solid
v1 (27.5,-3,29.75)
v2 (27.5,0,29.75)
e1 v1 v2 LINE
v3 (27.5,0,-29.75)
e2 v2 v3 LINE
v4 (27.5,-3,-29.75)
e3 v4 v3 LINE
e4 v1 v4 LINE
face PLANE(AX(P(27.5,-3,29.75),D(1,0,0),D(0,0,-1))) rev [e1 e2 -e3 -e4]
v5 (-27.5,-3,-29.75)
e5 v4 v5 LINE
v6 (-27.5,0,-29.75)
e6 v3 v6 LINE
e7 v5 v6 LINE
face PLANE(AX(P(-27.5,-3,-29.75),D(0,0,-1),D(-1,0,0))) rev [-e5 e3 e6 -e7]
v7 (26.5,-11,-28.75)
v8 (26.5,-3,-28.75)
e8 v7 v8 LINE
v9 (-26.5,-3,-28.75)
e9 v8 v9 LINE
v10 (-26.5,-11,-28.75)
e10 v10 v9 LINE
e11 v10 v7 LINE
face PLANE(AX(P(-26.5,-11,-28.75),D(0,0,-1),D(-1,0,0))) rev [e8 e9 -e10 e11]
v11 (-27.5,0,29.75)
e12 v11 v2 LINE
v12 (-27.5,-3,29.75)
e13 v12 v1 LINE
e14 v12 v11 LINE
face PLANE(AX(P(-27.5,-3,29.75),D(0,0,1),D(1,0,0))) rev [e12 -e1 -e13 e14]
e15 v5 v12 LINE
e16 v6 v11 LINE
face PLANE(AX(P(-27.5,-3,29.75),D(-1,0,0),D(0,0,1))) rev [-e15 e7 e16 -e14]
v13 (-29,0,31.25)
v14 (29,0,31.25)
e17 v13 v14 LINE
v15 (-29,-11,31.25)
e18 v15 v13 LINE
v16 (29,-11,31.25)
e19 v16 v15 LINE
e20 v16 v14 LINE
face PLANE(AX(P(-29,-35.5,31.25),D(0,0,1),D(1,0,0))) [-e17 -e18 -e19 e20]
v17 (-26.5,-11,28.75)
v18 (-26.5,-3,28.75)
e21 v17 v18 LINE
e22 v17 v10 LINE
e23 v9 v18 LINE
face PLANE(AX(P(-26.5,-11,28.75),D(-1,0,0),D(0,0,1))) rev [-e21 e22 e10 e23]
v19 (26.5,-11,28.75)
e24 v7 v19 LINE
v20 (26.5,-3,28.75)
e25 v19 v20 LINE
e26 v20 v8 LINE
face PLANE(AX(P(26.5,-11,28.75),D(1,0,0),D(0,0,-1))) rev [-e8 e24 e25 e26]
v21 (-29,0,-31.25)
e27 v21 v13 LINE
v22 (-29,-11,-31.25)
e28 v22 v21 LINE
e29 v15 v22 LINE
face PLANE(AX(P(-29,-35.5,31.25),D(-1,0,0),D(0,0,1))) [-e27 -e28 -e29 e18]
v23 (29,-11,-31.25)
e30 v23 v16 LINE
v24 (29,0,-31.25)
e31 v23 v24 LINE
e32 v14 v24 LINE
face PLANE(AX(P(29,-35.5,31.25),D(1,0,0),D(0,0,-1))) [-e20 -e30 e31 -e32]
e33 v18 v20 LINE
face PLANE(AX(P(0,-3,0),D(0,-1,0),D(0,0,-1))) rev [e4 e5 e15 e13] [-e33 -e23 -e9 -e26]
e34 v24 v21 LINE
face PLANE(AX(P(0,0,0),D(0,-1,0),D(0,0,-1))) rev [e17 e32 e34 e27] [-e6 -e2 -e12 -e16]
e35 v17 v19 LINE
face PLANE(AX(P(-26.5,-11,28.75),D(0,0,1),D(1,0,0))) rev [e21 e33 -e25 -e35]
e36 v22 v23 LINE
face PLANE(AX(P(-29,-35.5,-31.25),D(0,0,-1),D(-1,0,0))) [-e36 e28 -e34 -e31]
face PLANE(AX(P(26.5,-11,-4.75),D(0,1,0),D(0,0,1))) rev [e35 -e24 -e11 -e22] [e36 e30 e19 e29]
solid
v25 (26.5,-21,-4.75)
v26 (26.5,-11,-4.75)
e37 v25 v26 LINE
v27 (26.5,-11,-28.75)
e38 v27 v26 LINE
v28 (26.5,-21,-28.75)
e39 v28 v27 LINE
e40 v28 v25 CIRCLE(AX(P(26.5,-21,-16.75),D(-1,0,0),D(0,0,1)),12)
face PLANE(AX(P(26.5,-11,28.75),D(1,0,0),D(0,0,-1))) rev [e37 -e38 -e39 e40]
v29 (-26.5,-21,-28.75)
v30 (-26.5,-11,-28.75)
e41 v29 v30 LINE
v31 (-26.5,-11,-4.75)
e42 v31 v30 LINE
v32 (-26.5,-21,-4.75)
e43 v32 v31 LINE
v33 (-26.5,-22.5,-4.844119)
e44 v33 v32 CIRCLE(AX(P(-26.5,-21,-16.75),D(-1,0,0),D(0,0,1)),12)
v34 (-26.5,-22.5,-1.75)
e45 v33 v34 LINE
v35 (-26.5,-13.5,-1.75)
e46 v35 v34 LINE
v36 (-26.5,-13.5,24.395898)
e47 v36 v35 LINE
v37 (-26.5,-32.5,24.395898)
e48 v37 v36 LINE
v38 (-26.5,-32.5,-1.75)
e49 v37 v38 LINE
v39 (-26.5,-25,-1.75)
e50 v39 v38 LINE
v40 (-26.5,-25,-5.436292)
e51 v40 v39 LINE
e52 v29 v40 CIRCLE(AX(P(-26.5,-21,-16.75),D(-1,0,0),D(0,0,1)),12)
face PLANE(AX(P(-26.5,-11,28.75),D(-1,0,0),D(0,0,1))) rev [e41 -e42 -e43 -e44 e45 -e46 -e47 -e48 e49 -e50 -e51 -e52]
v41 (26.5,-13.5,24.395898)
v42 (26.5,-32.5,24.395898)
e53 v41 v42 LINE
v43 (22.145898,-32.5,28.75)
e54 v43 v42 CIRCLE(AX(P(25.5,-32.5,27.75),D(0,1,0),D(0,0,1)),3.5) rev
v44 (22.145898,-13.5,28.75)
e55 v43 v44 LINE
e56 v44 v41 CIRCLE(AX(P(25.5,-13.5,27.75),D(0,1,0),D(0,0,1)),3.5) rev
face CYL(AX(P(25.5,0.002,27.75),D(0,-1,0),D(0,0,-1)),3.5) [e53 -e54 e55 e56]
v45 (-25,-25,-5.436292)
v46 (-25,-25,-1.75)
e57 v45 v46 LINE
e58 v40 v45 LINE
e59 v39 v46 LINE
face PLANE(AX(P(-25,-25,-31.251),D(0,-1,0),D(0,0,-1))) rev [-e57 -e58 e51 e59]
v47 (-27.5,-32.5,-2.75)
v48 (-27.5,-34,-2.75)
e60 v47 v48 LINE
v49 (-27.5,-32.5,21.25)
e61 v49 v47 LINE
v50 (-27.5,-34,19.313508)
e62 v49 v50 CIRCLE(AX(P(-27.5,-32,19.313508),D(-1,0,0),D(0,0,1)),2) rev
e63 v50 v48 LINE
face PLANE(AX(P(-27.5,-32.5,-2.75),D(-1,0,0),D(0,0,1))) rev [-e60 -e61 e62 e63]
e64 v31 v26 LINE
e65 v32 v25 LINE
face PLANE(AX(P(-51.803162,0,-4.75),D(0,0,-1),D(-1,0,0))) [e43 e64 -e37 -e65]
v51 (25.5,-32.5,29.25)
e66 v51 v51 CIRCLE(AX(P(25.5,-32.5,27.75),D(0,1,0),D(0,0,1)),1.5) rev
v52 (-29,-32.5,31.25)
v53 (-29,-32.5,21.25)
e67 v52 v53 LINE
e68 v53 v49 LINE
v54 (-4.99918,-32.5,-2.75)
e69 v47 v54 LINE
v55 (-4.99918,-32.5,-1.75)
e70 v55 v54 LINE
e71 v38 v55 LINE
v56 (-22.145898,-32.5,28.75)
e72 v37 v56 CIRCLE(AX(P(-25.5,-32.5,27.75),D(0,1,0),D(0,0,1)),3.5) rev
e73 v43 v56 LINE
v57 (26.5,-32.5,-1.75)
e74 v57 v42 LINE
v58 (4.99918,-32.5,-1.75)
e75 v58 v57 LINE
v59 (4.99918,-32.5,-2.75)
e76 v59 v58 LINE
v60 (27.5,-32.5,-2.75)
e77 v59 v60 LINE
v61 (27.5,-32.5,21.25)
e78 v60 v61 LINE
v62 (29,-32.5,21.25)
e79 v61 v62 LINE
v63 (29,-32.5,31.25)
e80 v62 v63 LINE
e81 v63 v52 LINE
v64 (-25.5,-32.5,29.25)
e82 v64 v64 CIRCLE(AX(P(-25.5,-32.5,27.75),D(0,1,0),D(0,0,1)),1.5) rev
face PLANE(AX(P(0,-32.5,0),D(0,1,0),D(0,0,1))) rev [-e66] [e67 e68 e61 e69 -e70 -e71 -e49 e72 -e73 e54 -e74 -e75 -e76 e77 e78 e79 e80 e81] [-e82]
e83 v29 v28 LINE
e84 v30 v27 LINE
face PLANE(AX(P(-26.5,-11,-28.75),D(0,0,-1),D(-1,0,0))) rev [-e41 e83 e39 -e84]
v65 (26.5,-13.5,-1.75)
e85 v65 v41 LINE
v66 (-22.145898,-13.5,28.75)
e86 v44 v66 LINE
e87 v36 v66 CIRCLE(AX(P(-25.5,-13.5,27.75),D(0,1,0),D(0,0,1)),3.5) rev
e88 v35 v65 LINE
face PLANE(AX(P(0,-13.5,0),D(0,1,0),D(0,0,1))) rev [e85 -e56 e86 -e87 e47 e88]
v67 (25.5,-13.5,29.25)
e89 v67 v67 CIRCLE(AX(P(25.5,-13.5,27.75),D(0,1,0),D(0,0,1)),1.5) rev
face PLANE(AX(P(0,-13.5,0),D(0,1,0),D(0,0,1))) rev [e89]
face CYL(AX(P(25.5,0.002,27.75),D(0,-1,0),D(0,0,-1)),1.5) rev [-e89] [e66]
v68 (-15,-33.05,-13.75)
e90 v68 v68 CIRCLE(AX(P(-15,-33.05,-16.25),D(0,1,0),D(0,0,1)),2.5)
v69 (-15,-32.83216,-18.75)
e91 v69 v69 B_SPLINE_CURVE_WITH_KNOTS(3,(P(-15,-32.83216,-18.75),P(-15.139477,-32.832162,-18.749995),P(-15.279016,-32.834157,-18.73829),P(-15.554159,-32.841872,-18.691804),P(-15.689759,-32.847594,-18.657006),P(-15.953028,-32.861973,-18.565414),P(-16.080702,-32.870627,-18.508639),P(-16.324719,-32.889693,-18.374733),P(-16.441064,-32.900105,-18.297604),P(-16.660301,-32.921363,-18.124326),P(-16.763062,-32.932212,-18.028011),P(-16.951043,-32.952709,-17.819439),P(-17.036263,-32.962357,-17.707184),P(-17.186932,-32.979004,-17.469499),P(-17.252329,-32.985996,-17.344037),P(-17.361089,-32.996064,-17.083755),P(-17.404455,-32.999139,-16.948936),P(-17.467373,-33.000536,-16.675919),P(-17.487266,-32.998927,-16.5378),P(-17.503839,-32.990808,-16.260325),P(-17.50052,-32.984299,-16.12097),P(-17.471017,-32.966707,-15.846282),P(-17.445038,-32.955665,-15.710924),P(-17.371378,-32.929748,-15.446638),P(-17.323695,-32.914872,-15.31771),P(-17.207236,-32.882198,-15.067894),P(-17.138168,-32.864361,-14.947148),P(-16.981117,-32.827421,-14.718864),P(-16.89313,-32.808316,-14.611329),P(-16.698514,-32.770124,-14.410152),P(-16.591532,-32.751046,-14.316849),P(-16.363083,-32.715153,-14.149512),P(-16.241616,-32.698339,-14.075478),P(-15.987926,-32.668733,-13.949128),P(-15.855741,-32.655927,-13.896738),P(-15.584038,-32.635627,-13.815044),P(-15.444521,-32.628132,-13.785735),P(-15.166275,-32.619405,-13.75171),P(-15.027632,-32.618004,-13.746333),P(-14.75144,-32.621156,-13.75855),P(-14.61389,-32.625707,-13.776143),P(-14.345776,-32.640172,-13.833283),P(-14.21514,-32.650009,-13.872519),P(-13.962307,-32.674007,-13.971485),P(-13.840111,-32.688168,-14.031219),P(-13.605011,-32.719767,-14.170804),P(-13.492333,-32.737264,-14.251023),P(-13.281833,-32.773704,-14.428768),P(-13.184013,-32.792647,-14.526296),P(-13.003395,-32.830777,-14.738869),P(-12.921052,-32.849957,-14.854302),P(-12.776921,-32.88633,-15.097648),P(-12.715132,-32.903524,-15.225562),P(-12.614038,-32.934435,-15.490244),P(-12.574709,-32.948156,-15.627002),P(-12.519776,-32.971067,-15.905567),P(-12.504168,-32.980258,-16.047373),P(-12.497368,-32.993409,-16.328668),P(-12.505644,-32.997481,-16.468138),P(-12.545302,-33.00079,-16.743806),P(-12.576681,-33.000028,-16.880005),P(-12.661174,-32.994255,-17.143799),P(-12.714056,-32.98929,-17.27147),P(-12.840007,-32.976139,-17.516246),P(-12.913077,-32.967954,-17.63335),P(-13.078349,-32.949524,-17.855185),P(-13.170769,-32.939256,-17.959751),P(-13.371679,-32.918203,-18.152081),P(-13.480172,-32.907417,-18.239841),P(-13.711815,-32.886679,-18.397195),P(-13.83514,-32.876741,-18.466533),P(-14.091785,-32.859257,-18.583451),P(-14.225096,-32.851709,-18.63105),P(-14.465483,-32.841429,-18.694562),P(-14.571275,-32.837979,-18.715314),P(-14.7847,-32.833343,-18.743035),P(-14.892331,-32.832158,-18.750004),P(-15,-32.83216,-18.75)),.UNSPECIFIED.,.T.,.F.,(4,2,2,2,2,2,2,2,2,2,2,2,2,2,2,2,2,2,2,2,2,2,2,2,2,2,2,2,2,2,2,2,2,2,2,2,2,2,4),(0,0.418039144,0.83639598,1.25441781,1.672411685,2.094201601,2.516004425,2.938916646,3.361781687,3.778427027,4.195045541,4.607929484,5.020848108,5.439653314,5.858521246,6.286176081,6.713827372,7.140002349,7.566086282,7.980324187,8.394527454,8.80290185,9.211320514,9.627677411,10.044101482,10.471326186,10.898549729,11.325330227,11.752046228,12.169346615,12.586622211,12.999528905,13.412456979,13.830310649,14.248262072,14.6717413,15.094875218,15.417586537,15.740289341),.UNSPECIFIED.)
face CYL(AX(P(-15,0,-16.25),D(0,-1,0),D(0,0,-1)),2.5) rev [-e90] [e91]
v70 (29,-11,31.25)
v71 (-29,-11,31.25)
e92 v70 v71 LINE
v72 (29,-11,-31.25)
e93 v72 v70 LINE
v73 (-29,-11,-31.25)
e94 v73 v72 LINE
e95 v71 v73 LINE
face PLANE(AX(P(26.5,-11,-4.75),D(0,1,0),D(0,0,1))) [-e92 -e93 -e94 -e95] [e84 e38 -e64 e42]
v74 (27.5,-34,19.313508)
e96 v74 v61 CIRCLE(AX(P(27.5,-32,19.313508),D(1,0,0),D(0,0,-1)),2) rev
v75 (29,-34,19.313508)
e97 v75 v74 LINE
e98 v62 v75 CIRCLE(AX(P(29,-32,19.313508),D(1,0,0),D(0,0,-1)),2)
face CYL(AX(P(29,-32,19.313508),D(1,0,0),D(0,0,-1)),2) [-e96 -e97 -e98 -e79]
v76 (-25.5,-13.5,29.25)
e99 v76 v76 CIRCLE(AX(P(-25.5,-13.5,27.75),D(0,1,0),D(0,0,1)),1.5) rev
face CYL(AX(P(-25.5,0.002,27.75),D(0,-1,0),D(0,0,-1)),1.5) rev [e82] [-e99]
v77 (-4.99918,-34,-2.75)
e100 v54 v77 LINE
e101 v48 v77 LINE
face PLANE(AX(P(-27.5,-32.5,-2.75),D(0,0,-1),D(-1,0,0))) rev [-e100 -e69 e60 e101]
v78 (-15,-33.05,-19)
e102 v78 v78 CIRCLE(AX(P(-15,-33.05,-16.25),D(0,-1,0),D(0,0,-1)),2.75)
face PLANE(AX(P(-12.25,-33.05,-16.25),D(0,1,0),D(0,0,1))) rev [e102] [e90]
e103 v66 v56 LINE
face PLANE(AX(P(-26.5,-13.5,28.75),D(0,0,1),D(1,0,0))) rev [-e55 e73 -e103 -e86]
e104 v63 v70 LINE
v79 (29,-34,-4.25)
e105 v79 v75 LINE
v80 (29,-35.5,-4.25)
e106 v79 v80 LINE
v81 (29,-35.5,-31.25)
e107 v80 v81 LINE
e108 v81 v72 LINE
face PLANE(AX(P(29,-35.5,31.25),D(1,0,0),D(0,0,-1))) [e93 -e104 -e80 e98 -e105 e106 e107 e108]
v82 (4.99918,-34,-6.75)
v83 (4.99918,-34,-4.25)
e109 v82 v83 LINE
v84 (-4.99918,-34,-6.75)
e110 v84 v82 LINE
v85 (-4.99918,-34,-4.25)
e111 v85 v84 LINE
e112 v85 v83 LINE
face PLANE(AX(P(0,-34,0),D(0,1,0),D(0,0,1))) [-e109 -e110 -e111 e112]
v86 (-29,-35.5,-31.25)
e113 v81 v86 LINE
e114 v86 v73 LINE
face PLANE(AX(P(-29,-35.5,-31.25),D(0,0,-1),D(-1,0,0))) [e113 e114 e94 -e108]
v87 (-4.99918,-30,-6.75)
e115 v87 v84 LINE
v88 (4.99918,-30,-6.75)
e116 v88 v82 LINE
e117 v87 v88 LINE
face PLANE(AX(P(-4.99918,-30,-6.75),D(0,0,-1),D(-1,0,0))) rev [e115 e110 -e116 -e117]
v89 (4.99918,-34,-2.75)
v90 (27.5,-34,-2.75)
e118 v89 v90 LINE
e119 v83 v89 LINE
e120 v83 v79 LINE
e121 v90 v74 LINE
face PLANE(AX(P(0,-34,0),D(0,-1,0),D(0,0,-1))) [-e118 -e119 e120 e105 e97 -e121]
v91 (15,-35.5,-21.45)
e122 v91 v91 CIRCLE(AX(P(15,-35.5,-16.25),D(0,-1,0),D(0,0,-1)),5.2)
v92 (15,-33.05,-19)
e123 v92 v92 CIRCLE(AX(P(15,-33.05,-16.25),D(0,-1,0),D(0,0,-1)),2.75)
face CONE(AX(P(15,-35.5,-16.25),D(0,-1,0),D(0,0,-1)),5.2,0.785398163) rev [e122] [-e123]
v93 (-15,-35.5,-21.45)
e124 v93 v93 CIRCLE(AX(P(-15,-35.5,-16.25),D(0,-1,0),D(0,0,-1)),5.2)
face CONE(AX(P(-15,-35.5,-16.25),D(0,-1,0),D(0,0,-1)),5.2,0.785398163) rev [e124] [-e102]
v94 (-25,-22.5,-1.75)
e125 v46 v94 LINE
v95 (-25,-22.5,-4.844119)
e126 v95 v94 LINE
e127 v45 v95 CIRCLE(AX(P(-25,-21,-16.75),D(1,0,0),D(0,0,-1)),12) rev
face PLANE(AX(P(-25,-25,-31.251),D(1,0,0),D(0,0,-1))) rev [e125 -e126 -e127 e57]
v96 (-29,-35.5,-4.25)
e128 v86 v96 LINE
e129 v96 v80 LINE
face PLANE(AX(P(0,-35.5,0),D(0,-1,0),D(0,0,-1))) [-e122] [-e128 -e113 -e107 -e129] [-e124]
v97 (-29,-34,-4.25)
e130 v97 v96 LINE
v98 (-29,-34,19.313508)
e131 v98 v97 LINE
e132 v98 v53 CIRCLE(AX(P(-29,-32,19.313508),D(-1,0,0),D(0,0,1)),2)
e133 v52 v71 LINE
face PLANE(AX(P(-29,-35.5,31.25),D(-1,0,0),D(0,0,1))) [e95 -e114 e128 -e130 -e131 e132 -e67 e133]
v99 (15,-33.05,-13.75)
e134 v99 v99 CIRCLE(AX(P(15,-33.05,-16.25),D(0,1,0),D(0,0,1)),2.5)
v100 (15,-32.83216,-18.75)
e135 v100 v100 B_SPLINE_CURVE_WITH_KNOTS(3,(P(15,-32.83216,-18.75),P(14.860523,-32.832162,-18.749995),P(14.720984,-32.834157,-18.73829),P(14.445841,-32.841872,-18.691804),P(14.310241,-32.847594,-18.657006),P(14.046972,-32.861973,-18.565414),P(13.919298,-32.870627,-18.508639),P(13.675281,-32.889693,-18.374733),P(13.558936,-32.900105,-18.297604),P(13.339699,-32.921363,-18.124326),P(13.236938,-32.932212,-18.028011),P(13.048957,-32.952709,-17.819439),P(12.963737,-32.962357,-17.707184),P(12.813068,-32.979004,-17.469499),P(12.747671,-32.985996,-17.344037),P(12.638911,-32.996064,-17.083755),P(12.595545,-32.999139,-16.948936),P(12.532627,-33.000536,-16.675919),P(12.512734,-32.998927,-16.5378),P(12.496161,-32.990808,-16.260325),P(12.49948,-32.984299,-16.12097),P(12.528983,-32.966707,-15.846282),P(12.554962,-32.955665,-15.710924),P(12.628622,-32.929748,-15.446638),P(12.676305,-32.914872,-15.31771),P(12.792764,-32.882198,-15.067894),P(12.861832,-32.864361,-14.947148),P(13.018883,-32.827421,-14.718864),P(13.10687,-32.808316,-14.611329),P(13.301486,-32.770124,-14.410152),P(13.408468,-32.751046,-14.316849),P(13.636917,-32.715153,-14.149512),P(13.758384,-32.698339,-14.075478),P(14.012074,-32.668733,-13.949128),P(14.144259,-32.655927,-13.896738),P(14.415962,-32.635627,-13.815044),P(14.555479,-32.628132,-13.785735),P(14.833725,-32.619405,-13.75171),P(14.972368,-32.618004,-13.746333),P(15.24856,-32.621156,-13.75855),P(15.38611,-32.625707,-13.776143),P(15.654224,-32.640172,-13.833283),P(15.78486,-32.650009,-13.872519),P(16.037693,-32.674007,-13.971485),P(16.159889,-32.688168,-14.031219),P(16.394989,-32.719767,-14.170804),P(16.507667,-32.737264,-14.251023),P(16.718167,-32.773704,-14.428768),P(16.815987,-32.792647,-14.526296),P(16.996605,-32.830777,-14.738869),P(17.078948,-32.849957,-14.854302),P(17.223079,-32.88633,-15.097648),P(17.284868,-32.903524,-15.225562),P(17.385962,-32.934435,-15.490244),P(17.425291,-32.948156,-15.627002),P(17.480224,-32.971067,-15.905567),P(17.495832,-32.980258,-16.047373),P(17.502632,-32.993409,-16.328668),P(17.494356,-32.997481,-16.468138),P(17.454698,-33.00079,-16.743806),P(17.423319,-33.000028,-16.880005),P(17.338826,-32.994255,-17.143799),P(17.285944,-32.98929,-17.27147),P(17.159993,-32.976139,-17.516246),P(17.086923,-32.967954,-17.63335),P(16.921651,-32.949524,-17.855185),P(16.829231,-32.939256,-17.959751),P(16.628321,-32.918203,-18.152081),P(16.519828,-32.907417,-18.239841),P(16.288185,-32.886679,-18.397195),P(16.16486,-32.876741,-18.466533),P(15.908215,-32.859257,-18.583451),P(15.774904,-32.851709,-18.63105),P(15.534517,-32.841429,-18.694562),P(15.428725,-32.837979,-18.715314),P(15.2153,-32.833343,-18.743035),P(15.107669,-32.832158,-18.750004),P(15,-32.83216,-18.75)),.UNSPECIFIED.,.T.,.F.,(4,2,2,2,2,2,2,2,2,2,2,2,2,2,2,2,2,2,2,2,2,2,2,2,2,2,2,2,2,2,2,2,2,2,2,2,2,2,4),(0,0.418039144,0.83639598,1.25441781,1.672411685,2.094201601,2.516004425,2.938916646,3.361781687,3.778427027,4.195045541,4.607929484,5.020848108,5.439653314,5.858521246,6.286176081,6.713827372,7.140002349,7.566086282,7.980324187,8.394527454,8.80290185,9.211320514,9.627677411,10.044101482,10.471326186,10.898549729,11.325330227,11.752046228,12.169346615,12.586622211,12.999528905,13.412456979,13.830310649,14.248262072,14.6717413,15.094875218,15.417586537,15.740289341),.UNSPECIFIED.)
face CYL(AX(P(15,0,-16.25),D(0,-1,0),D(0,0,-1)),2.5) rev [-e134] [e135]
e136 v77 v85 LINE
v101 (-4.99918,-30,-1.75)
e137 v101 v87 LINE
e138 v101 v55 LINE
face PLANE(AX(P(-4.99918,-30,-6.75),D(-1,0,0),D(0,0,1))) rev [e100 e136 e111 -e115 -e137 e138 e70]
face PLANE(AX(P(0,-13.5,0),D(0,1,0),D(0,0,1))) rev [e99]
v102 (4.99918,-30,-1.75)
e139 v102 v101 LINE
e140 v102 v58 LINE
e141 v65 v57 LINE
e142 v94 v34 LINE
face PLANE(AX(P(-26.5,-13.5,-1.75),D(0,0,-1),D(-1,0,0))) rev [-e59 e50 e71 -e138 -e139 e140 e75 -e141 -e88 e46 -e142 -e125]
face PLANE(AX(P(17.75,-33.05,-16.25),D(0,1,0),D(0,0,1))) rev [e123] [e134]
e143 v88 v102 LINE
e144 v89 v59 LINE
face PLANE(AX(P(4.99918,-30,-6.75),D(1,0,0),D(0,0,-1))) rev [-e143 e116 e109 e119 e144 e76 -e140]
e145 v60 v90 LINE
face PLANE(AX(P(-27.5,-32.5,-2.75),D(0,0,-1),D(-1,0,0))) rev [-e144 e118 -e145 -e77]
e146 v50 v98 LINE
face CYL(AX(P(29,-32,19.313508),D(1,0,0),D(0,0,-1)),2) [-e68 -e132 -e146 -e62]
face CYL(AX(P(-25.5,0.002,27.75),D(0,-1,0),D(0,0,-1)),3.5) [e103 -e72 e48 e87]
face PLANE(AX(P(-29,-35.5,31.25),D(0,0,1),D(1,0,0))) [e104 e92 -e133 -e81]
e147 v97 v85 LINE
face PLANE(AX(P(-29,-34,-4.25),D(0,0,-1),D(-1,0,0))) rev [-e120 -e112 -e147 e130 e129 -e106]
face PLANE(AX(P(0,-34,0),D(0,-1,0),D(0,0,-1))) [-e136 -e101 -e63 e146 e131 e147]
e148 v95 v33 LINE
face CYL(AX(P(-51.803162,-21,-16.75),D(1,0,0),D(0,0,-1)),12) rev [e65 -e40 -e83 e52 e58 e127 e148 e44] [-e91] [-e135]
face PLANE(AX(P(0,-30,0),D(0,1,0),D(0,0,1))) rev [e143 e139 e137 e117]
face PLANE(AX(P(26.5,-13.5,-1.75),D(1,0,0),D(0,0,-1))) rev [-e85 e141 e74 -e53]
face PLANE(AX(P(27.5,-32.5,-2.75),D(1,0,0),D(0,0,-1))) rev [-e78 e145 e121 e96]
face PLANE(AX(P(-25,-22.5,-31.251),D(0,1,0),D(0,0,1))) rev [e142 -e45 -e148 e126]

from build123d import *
from build123d.topology import SkipClean

# Parameters (mm, degrees)
SKETCH1_W                 = 58
SKETCH1_H                 = 62.5
BOSS_EXTRUDE1_DEPTH       = 35.5
SKETCH2_W                 = 55
SKETCH2_H                 = 59.5
CUT_EXTRUDE1_DEPTH        = 3
SKETCH3_W                 = 53
SKETCH3_H                 = 57.5
CUT_EXTRUDE2_DEPTH        = 8
SKETCH4_W                 = 53
SKETCH4_H                 = 24.5
CUT_EXTRUDE3_DEPTH        = 22
SKETCH5_W                 = 53
SKETCH5_H                 = 30.5
CUT_EXTRUDE4_DEPTH        = 22
BOSS_EXTRUDE2_REACH       = 57.478
SKETCH6_R                 = 3.5
SKETCH6_R_2               = 1.5
SKETCH6_2_R               = 1.5
CUT_EXTRUDE5_DEPTH        = 22
BOSS_EXTRUDE4_DEPTH       = 53
SKETCH8_W                 = 58
SKETCH8_H                 = 35.5
CUT_EXTRUDE6_DEPTH        = 1.5
SKETCH10_W                = 9.998360964
SKETCH10_H                = 5
CUT_EXTRUDE8_DEPTH        = 4
CUT_EXTRUDE7_REACH        = 58.482
CUT_EXTRUDE7_END_RADIUS   = 12
SKETCH9_W                 = 1.5
SKETCH9_H                 = 2.5
SKETCH11_W                = 55
SKETCH11_H                = 32.5
CUT_EXTRUDE9_DEPTH        = 1.5
SKETCH12_W                = 58
SKETCH12_H                = 10
CUT_EXTRUDE10_DEPTH       = 1.5
FILLET2_R                 = 2
ADVANCEDHOLE1_OUTLINE_R   = 2.75
ADVANCEDHOLE1_DEPTH       = 2.45
ADVANCEDHOLE1_DRAFT       = 45
ADVANCEDHOLE1_2_OUTLINE_R = 2.75
ADVANCEDHOLE1_2_DEPTH     = 2.45
ADVANCEDHOLE1_2_DRAFT     = 45
SKETCH13_R                = 2.5
CUT_EXTRUDE11_DEPTH       = 56.478036195
SPLIT1_START              = -31.25
SPLIT1_OUTLINE_W          = 58
SPLIT1_OUTLINE_H          = 11
SPLIT1_DEPTH              = 62.5
SPLIT1_2_DEPTH            = 62.5
SPLIT1_3_OUTLINE_W        = 53
SPLIT1_3_OUTLINE_H        = 8
SPLIT1_3_DEPTH            = 2.5
SPLIT1_START_2            = 28.75
SPLIT1_4_OUTLINE_W        = 53
SPLIT1_4_OUTLINE_H        = 8
SPLIT1_4_DEPTH            = 2.5
SPLIT1_5_OUTLINE_W        = 55
SPLIT1_5_OUTLINE_H        = 3
SPLIT1_5_DEPTH            = 1.5
SPLIT1_START_3            = 29.75
SPLIT1_6_OUTLINE_W        = 55
SPLIT1_6_OUTLINE_H        = 3
SPLIT1_6_DEPTH            = 1.5


# Read off the part's stored shape, not the designer's step: AdvancedHole1, Split1
with BuildPart() as part:
    # Sketch1 → Boss-Extrude1 (new body)
    with BuildSketch(Plane(origin=(0, 0, 0), x_dir=(1, 0, 0), z_dir=(0, 1, 0))):
        Rectangle(SKETCH1_W, SKETCH1_H)
    extrude(amount=-BOSS_EXTRUDE1_DEPTH)

    # Sketch2 → Cut-Extrude1 (cut)
    with BuildSketch(Plane(origin=(0, 0, 0), x_dir=(1, 0, 0), z_dir=(0, 1, 0))):
        Rectangle(SKETCH2_W, SKETCH2_H)
    extrude(amount=-CUT_EXTRUDE1_DEPTH, mode=Mode.SUBTRACT)

    # Sketch3 → Cut-Extrude2 (cut)
    with BuildSketch(Plane(origin=(0, -3, 0), x_dir=(1, 0, 0), z_dir=(0, 1, 0))):
        Rectangle(SKETCH3_W, SKETCH3_H)
    extrude(amount=-CUT_EXTRUDE2_DEPTH, mode=Mode.SUBTRACT)

    # Sketch4 → Cut-Extrude3 (cut)
    with BuildSketch(Plane(origin=(0, -11, 0), x_dir=(1, 0, 0), z_dir=(0, 1, 0))):
        with Locations((0, 16.5)):
            Rectangle(SKETCH4_W, SKETCH4_H)
    extrude(amount=-CUT_EXTRUDE3_DEPTH, mode=Mode.SUBTRACT)

    # Sketch5 → Cut-Extrude4 (cut)
    with BuildSketch(Plane.XZ.offset(35.5)):
        with Locations((0, 13.5)):
            Rectangle(SKETCH5_W, SKETCH5_H)
    extrude(amount=-CUT_EXTRUDE4_DEPTH, mode=Mode.SUBTRACT)

    # Sketch6 → Boss-Extrude2 (add, up to next)
    with BuildSketch(Plane.XZ.offset(35.5), mode=Mode.PRIVATE) as boss_extrude2_sk1:
        with Locations((-25.5, 27.75)):
            Circle(SKETCH6_R)
        with Locations((-25.5, 27.75)):
            Circle(SKETCH6_R_2, mode=Mode.SUBTRACT)
    boss_extrude2_tool1 = extrude(boss_extrude2_sk1.sketch, amount=-BOSS_EXTRUDE2_REACH, mode=Mode.PRIVATE) - part.part
    # Sketch6 → Boss-Extrude2 (add, up to next)
    with BuildSketch(Plane.XZ.offset(35.5), mode=Mode.PRIVATE) as boss_extrude2_sk2:
        with Locations((25.5, 27.75)):
            Circle(SKETCH6_R)
        with Locations((25.5, 27.75)):
            Circle(SKETCH6_R_2, mode=Mode.SUBTRACT)
    boss_extrude2_tool2 = extrude(boss_extrude2_sk2.sketch, amount=-BOSS_EXTRUDE2_REACH, mode=Mode.PRIVATE) - part.part
    add(boss_extrude2_tool1.solids().sort_by_distance((-28.901005, -35.5, 27.75))[0])
    add(boss_extrude2_tool2.solids().sort_by_distance((22.098995, -35.5, 27.75))[0])

    # Sketch6<2> → Cut-Extrude5 (cut)
    with BuildSketch(Plane.XZ.offset(35.5)):
        with Locations(Location((-25.5, 27.75, 0), (0, 0, 270))):
            Circle(SKETCH6_2_R)
        with Locations(Location((25.5, 27.75, 0), (0, 0, 90))):
            Circle(SKETCH6_2_R)
    extrude(amount=-CUT_EXTRUDE5_DEPTH, mode=Mode.SUBTRACT)

    # Sketch7 → Boss-Extrude4 (add)
    with BuildSketch(Plane.ZY.offset(-26.5)):
        with BuildLine():
            Line((-16.75, -33), (-4.25, -33))
            Line((-4.25, -33), (-4.25, -11))
            Line((-4.25, -11), (-4.75, -11))
            Line((-4.75, -11), (-4.75, -21))
            ThreePointArc((-4.75, -21), (-8.264718626, -29.485281374), (-16.75, -33))
        make_face()
        with BuildLine():
            Line((-28.75, -33), (-16.75, -33))
            ThreePointArc((-16.75, -33), (-25.235281374, -29.485281374), (-28.75, -21))
            Line((-28.75, -21), (-28.75, -33))
        make_face()
    extrude(amount=BOSS_EXTRUDE4_DEPTH)

    # Sketch8 → Cut-Extrude6 (cut)
    with BuildSketch(Plane.XZ.offset(35.5)):
        with Locations((0, 13.5)):
            Rectangle(SKETCH8_W, SKETCH8_H)
    extrude(amount=-CUT_EXTRUDE6_DEPTH, mode=Mode.SUBTRACT)

    # Sketch10 → Cut-Extrude8 (cut)
    with BuildSketch(Plane.XZ.offset(34)):
        with Locations((0, -4.25)):
            Rectangle(SKETCH10_W, SKETCH10_H)
    extrude(amount=-CUT_EXTRUDE8_DEPTH, mode=Mode.SUBTRACT)

    # Cut-Extrude7: up to this cylinder (the profile starts outside it)
    cut_extrude7_end = Plane(origin=(-25.75, -21, -16.75), z_dir=(1, 0, 0)) * Cylinder(CUT_EXTRUDE7_END_RADIUS, 141.964, mode=Mode.PRIVATE)
    # Sketch9 → Cut-Extrude7 (cut, up to the surface)
    with BuildSketch(Plane.XY.offset(-1.75), mode=Mode.PRIVATE) as cut_extrude7_sk1:
        with Locations((-25.75, -23.75)):
            Rectangle(SKETCH9_W, SKETCH9_H)
    cut_extrude7_tool1 = extrude(cut_extrude7_sk1.sketch, amount=-CUT_EXTRUDE7_REACH, mode=Mode.PRIVATE) - cut_extrude7_end
    add(cut_extrude7_tool1.solids().sort_by_distance((-25.75, -23.75, -1.75))[0], mode=Mode.SUBTRACT)

    # Sketch11 → Cut-Extrude9 (cut)
    with BuildSketch(Plane.XZ.offset(34)):
        with Locations((0, 13.5)):
            Rectangle(SKETCH11_W, SKETCH11_H)
    extrude(amount=-CUT_EXTRUDE9_DEPTH, mode=Mode.SUBTRACT)

    # Sketch12 → Cut-Extrude10 (cut)
    with BuildSketch(Plane.XZ.offset(34)):
        with Locations((0, 26.25)):
            Rectangle(SKETCH12_W, SKETCH12_H)
    extrude(amount=-CUT_EXTRUDE10_DEPTH, mode=Mode.SUBTRACT)

    # Fillet2
    # the kernel refuses this fillet: 2 mm, written as the material it takes off along each edge
    with BuildSketch(Plane(origin=(-22.658770817, -34, 21.25), x_dir=(0, 0, -1), z_dir=(-1, 0, 0))) as fillet2_piece_1:
        with BuildLine():
            CenterArc((1.936491673, -2), FILLET2_R, 90, 75.522487814)
            Line((0, -1.5), (-0.038729833, -1.49))
            ThreePointArc((-0.038729833, -1.49), (-0.04, -0.75), (-0.04, 0))
            Line((-0.04, 0), (0, 0.04))
            Line((0, 0.04), (1.936491673, 0.04))
            Line((1.936491673, 0.04), (1.936491673, 0))
        make_face()
    extrude(amount=11.182458366, mode=Mode.SUBTRACT)
    with BuildSketch(Plane(origin=(33.841229183, -34, 21.25), x_dir=(0, 1, 0), z_dir=(-1, 0, 0))) as fillet2_piece_2:
        with BuildLine():
            CenterArc((2, 1.936491673), FILLET2_R, 180, 75.522487814)
            Line((0, 1.936491673), (-0.04, 1.936491673))
            Line((-0.04, 1.936491673), (-0.04, 0))
            Line((-0.04, 0), (0, -0.04))
            ThreePointArc((0, -0.04), (0.75, -0.04), (1.49, -0.038729833))
            Line((1.49, -0.038729833), (1.5, 0))
        make_face()
    extrude(amount=11.182458366, mode=Mode.SUBTRACT)


with BuildPart() as advancedhole1_tool:
    # AdvancedHole1 outline → AdvancedHole1 (with draft: the straight prism first)
    with BuildSketch(Plane(origin=(0, -33.05, 0), x_dir=(1, 0, 0), z_dir=(0, 1, 0))):
        with Locations((15, 16.25)):
            Circle(ADVANCEDHOLE1_OUTLINE_R)
    extrude(amount=-ADVANCEDHOLE1_DEPTH)
    # AdvancedHole1: the draft: its side faces are tilted about the plane it starts from
    advancedhole1_sides = [advancedhole1_tool.faces().sort_by_distance(p)[0] for p in [
        (12.25, -34.275, -16.25),
    ]]
    draft(advancedhole1_sides, Plane(origin=(0, -33.05, 0), x_dir=(1, 0, 0), z_dir=(0, 1, 0)), ADVANCEDHOLE1_DRAFT)


with BuildPart() as part_1:
    add(part.part)

    # AdvancedHole1: cut by advancedhole1_tool
    add(advancedhole1_tool.part, mode=Mode.SUBTRACT)


with BuildPart() as advancedhole1_2_tool:
    # AdvancedHole1 2 outline → AdvancedHole1 2 (with draft: the straight prism first)
    with BuildSketch(Plane(origin=(0, -33.05, 0), x_dir=(1, 0, 0), z_dir=(0, 1, 0))):
        with Locations((-15, 16.25)):
            Circle(ADVANCEDHOLE1_2_OUTLINE_R)
    extrude(amount=-ADVANCEDHOLE1_2_DEPTH)
    # AdvancedHole1 2: the draft: its side faces are tilted about the plane it starts from
    advancedhole1_2_sides = [advancedhole1_2_tool.faces().sort_by_distance(p)[0] for p in [
        (-17.75, -34.275, -16.25),
    ]]
    draft(advancedhole1_2_sides, Plane(origin=(0, -33.05, 0), x_dir=(1, 0, 0), z_dir=(0, 1, 0)), ADVANCEDHOLE1_2_DRAFT)


with BuildPart() as part_2:
    add(part_1.part)

    # AdvancedHole1 2: cut by advancedhole1_2_tool
    add(advancedhole1_2_tool.part, mode=Mode.SUBTRACT)

    # Sketch13 → Cut-Extrude11 (cut, through all)
    with SkipClean():  # the faces are left unmerged after this step: merging them gives an invalid solid
        with BuildSketch(Plane.XZ.offset(35.5)):
            with Locations(Location((15, -16.25, 0), (0, 0, 270))):
                Circle(SKETCH13_R)
            with Locations(Location((-15, -16.25, 0), (0, 0, 270))):
                Circle(SKETCH13_R)
        extrude(amount=-CUT_EXTRUDE11_DEPTH, mode=Mode.SUBTRACT)

    # Split1 outline → Split1 (cut)
    with SkipClean():  # the faces are left unmerged after this step: merging them gives an invalid solid
        with BuildSketch(Plane.XY.offset(SPLIT1_START)):
            with Locations((0, -5.5)):
                Rectangle(SPLIT1_OUTLINE_W, SPLIT1_OUTLINE_H)
        extrude(amount=SPLIT1_DEPTH, mode=Mode.SUBTRACT)


with BuildPart() as body_2:
    # Split1 2 outline → Split1 2 (new body)
    with BuildSketch(Plane.XY.offset(SPLIT1_START)):
        Polygon((26.5, -11), (29, -11), (29, 0), (27.5, 0), (27.5, -3), (26.5, -3), align=None)
        Polygon((-29, -11), (-26.5, -11), (-26.5, -3), (-27.5, -3), (-27.5, 0), (-29, 0), align=None)
    extrude(amount=SPLIT1_2_DEPTH)

    # Split1 3 outline → Split1 3 (add)
    with BuildSketch(Plane.XY.offset(SPLIT1_START)):
        with Locations((0, -7)):
            Rectangle(SPLIT1_3_OUTLINE_W, SPLIT1_3_OUTLINE_H)
    extrude(amount=SPLIT1_3_DEPTH)

    # Split1 4 outline → Split1 4 (add)
    with BuildSketch(Plane.XY.offset(SPLIT1_START_2)):
        with Locations((0, -7)):
            Rectangle(SPLIT1_4_OUTLINE_W, SPLIT1_4_OUTLINE_H)
    extrude(amount=SPLIT1_4_DEPTH)

    # Split1 5 outline → Split1 5 (add)
    with BuildSketch(Plane.XY.offset(SPLIT1_START)):
        with Locations((0, -1.5)):
            Rectangle(SPLIT1_5_OUTLINE_W, SPLIT1_5_OUTLINE_H)
    extrude(amount=SPLIT1_5_DEPTH)

    # Split1 6 outline → Split1 6 (add)
    with BuildSketch(Plane.XY.offset(SPLIT1_START_3)):
        with Locations((0, -1.5)):
            Rectangle(SPLIT1_6_OUTLINE_W, SPLIT1_6_OUTLINE_H)
    extrude(amount=SPLIT1_6_DEPTH)


solid = Compound([part_2.part, body_2.part])
